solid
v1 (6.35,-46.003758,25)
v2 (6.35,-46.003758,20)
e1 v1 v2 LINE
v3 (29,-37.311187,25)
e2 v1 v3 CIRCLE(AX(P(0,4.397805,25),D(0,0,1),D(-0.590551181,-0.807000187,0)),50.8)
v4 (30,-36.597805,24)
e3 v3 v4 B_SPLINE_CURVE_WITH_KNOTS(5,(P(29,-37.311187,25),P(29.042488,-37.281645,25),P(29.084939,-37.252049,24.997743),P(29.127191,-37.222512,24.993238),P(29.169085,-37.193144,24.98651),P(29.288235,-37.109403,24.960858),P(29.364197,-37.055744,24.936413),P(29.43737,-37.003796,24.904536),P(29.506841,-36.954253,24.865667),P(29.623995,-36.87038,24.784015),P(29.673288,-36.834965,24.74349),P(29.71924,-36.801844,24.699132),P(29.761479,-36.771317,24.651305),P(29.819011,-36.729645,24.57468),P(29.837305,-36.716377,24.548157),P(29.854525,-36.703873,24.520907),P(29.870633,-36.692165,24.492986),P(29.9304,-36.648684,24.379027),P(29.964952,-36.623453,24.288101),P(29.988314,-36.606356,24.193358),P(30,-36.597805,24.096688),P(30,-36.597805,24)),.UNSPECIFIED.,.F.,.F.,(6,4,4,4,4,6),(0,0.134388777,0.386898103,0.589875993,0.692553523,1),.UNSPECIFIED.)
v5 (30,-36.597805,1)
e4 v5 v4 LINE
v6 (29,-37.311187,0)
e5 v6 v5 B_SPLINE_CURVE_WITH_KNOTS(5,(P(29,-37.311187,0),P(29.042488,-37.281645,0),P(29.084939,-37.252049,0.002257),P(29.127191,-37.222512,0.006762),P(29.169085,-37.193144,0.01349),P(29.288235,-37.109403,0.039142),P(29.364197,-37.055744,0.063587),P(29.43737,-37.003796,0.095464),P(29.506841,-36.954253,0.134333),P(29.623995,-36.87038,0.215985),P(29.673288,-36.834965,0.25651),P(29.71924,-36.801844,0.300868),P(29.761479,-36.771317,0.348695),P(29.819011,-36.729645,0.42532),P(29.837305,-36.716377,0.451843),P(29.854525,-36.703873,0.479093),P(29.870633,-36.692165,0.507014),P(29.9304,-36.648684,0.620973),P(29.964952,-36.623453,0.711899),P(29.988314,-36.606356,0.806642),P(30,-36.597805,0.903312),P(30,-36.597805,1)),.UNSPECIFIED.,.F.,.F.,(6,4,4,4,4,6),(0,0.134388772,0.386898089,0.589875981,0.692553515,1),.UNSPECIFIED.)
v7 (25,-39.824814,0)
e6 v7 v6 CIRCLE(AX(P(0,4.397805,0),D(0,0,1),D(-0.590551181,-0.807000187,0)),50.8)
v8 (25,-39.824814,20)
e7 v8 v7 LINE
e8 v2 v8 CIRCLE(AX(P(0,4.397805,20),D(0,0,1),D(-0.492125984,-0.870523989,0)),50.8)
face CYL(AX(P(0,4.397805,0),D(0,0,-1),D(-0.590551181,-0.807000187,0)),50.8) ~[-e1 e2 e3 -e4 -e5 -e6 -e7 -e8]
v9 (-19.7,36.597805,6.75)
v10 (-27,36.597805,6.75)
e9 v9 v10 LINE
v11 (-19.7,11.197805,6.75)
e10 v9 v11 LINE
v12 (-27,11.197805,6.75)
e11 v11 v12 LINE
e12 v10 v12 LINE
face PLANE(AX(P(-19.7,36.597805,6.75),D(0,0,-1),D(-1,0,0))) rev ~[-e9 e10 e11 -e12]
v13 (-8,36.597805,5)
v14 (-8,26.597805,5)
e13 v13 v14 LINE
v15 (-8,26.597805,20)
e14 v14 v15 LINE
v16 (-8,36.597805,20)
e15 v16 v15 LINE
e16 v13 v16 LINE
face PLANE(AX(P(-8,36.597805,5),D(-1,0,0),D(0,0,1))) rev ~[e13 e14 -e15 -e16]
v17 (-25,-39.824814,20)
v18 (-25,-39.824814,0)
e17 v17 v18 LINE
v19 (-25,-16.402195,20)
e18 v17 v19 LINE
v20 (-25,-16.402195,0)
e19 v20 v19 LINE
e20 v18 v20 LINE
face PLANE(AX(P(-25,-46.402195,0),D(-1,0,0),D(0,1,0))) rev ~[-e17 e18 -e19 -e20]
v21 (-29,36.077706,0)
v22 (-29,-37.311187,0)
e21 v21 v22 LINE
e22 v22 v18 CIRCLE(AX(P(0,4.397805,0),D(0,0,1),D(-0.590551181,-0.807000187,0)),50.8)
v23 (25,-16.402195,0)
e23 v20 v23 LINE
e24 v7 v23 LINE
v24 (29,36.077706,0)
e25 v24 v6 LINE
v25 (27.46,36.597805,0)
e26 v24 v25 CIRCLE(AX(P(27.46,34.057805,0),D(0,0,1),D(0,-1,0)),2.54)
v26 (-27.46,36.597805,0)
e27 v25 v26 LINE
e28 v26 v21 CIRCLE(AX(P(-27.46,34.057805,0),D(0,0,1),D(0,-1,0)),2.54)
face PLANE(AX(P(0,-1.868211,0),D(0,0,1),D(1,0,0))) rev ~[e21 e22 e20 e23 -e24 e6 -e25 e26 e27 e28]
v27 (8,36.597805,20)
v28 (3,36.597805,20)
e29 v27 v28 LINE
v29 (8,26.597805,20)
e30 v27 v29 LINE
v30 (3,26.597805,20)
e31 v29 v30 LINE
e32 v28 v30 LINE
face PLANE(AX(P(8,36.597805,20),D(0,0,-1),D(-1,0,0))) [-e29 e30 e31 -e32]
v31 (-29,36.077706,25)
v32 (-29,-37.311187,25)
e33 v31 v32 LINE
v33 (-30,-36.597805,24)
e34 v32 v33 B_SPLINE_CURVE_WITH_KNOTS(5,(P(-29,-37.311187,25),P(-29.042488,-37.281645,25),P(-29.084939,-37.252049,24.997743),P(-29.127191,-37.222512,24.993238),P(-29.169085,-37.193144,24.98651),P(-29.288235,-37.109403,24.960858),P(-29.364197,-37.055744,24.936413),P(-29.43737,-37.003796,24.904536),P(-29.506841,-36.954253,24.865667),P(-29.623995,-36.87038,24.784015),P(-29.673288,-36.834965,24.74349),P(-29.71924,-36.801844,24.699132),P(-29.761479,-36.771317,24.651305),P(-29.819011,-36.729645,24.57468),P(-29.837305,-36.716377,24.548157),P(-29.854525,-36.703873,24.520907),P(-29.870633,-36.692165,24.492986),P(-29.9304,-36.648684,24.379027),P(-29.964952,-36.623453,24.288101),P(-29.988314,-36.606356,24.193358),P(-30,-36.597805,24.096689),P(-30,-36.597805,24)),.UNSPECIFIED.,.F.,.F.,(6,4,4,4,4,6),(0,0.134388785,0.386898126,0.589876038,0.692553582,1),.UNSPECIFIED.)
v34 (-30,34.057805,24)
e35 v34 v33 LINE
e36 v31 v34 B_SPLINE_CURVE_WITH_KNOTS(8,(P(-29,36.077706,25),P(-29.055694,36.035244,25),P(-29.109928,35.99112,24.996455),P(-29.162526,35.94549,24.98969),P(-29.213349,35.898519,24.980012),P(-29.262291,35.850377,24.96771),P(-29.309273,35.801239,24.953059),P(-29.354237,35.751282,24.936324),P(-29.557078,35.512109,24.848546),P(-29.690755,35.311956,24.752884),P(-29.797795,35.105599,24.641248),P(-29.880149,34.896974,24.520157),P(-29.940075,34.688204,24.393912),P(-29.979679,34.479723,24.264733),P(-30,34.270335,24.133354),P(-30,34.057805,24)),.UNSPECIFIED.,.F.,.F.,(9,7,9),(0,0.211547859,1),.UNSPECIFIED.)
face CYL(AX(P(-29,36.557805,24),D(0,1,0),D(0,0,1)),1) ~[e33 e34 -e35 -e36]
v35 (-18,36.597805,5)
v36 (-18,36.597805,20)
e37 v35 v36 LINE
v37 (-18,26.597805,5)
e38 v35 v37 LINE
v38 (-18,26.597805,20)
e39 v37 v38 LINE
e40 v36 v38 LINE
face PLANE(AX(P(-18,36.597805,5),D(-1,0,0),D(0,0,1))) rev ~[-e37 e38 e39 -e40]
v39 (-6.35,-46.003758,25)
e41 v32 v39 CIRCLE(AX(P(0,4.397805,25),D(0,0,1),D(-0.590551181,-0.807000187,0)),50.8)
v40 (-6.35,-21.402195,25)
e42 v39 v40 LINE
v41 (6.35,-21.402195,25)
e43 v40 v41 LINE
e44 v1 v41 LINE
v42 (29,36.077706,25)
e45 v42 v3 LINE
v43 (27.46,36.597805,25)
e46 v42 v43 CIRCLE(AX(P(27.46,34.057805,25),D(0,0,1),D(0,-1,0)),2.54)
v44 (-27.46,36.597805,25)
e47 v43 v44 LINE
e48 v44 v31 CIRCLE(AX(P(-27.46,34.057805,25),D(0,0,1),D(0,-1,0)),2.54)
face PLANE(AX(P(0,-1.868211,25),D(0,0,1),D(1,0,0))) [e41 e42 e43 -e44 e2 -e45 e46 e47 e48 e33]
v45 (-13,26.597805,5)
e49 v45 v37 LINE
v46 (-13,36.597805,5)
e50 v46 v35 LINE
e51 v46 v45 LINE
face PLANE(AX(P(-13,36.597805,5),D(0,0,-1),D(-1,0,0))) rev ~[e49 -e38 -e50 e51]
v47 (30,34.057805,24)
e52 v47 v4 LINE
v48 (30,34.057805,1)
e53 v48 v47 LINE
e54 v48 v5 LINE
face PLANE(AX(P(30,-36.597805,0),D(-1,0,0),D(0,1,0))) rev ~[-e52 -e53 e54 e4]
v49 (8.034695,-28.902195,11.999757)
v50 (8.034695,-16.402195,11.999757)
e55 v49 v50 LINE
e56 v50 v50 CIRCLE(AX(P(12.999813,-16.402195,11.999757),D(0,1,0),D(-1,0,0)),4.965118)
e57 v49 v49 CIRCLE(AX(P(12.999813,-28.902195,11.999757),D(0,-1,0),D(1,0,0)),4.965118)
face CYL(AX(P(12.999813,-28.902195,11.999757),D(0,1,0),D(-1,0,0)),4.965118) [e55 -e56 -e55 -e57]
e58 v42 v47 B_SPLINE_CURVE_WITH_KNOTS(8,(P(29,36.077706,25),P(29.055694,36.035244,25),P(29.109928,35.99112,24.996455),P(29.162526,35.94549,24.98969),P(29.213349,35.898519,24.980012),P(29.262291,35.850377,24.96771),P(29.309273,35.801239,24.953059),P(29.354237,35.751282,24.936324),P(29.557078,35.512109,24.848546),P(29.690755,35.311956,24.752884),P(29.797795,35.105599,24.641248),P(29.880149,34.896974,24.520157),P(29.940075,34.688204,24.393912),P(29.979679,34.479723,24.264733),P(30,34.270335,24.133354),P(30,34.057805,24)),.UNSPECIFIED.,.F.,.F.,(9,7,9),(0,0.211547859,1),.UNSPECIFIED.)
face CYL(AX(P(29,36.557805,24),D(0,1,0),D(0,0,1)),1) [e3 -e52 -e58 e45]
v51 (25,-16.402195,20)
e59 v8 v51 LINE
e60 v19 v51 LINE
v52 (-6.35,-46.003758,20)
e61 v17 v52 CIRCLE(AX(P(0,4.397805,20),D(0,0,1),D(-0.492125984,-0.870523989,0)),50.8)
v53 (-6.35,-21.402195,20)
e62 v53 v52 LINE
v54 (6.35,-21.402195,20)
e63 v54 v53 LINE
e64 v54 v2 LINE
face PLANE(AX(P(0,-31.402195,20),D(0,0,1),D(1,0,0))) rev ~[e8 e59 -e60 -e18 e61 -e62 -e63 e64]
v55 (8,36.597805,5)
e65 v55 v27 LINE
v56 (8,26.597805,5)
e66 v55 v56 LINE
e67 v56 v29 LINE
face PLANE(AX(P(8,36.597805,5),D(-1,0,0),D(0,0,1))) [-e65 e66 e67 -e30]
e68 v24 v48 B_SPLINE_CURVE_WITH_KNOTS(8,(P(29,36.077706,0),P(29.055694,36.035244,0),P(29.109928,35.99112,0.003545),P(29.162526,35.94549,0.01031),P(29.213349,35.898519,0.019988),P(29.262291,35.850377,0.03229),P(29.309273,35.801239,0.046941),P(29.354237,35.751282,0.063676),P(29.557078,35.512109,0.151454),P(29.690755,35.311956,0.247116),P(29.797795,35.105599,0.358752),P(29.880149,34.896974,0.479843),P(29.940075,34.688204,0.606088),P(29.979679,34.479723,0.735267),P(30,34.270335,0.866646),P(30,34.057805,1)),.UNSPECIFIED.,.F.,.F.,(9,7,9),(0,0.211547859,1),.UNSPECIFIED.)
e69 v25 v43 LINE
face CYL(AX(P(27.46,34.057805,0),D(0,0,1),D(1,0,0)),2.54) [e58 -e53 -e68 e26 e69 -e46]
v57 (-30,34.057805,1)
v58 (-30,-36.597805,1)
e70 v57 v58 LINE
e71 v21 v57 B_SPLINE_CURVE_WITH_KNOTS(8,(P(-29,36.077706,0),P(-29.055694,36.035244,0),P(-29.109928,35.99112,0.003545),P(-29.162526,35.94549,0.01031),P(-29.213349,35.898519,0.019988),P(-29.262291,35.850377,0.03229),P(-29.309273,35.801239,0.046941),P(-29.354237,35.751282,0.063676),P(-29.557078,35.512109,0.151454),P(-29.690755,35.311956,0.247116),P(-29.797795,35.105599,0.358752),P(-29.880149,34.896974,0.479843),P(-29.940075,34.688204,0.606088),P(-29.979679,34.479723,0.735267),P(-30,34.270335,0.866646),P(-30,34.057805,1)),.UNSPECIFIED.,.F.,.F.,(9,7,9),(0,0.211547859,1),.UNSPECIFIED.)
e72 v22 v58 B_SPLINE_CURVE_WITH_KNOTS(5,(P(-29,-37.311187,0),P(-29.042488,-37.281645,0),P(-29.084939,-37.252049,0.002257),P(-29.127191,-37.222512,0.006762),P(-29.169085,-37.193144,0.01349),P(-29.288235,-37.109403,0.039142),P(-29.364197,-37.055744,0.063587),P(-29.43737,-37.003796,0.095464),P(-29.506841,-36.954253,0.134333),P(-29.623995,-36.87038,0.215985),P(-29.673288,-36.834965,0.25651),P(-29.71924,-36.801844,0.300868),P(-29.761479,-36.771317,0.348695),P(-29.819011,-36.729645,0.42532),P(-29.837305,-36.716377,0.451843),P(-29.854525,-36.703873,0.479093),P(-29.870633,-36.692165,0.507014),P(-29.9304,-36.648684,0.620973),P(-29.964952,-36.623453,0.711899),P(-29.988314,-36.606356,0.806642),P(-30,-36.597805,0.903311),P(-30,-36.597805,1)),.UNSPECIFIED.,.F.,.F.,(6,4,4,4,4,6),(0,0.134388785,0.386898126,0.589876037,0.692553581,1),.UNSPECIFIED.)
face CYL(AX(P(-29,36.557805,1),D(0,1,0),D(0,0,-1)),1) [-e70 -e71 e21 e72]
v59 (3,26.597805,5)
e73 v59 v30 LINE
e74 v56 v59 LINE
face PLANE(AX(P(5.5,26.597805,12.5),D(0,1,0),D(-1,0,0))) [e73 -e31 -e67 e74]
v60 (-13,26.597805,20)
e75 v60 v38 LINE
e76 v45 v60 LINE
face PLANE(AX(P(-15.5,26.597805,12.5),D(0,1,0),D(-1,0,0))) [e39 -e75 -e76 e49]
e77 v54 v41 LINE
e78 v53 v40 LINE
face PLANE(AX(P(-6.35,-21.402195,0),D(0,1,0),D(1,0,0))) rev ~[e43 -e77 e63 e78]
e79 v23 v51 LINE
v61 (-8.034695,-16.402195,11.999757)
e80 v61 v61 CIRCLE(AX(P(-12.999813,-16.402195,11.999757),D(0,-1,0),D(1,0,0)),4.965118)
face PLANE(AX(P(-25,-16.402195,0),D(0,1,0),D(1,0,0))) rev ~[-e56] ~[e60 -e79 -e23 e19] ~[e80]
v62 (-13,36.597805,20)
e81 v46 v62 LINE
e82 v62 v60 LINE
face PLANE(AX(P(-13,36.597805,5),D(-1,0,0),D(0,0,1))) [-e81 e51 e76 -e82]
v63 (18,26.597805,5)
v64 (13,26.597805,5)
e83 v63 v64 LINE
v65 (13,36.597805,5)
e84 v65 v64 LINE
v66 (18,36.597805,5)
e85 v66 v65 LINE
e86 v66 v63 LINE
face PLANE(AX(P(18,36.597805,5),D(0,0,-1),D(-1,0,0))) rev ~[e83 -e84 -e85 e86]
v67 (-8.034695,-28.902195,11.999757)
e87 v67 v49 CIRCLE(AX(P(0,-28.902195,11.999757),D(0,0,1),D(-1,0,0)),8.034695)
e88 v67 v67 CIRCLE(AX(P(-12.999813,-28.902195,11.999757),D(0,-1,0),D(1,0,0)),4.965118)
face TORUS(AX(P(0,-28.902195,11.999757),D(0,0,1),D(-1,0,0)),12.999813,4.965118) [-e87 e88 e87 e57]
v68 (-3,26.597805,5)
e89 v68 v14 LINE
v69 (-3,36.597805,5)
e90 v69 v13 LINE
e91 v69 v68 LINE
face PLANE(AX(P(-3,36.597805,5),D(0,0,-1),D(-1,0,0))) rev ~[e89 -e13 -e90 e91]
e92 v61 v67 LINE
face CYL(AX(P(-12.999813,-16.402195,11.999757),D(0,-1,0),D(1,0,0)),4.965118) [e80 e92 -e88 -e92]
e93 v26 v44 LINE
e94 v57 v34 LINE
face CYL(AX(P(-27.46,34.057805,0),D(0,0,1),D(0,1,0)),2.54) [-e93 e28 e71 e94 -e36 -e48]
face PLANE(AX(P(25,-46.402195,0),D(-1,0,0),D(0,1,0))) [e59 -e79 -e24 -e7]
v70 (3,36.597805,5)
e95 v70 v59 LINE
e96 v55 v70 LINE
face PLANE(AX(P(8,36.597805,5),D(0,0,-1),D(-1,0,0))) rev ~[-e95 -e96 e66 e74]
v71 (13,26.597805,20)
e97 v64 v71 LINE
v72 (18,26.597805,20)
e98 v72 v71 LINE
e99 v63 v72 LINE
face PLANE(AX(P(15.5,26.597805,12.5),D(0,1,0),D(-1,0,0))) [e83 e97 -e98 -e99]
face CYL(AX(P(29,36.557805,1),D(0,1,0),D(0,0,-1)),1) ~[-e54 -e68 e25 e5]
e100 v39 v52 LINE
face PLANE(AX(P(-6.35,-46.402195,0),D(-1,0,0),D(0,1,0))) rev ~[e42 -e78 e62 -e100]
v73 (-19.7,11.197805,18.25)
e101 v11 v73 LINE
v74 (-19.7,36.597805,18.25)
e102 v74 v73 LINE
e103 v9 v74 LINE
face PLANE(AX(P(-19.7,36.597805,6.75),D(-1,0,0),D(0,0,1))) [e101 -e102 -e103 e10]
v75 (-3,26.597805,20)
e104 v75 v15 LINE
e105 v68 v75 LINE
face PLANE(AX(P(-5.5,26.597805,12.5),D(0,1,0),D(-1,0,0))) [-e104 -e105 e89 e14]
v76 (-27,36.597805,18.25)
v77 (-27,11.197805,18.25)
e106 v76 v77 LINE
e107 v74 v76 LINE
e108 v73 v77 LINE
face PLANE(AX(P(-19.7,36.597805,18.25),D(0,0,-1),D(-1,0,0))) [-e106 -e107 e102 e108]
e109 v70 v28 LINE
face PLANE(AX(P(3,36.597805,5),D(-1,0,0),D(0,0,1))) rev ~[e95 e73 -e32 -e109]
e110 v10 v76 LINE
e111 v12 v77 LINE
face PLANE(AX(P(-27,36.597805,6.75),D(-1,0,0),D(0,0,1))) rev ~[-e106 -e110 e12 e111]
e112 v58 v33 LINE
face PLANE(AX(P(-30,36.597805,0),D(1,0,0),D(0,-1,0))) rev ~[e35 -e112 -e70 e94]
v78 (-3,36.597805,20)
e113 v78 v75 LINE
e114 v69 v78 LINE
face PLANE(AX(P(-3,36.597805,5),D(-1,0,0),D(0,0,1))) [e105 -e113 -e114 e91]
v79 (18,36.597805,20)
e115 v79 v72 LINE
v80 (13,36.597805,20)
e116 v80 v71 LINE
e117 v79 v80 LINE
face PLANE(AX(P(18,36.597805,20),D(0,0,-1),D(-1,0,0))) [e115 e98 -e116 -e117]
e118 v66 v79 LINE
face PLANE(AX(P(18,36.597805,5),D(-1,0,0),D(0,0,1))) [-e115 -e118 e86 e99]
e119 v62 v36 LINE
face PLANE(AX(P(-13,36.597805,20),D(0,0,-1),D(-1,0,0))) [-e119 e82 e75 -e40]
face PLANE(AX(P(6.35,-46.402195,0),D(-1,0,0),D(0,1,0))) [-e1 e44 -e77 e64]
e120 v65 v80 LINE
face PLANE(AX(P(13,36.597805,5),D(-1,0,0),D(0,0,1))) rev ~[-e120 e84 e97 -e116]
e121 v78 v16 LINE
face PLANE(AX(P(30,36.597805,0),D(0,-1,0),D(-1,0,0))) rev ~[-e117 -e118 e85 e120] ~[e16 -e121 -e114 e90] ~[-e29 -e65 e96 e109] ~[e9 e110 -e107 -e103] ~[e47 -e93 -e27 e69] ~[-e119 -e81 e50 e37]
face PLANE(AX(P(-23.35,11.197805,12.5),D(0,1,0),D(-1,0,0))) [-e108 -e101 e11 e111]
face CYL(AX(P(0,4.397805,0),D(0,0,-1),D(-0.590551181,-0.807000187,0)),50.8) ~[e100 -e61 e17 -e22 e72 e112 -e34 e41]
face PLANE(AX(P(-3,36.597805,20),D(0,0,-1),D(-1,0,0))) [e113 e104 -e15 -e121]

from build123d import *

# Parameters (mm, degrees)
F1_DEPTH    = 25
F3_R        = 2.54
F4_W        = 50
F4_H        = 30
F5_DEPTH    = 20
F2_W        = 12.7
F2_H        = 25
F6_DEPTH    = 25
F7_T1_DEPTH = 75.655609521
F9_W        = 5
F9_H        = 15
F10_DEPTH   = 10
F11_W       = 7.3
F11_H       = 11.5
F12_DEPTH   = 25.4
F15_R       = 4.9651178244


# Not quite as in the source:
# - a fillet or chamfer that OpenCascade refuses, or shapes differently, is made with other operations: its cross-section is extruded or revolved along the edge and cut away or added
# - a feature names something its author has since deleted; it is built from what else it names


with BuildPart() as f1:
    # F0 (on Top) → F1 (new body)
    with BuildSketch(Plane.XY):
        with BuildLine():
            Line((30, -36.5978047605), (30, 36.5978047605))
            Line((30, 36.5978047605), (-30, 36.5978047605))
            Line((-30, 36.5978047605), (-30, -36.5978047605))
            ThreePointArc((-30, -36.5978047605), (0, -46.4021952395), (30, -36.5978047605))
        make_face()
    extrude(amount=F1_DEPTH)

    # F3
    f3_edges = [f1.edges().sort_by_distance(p)[0] for p in [
        (-30, 36.597805, 12.5),
        (30, 36.597805, 12.5),
    ]]
    fillet(f3_edges, radius=F3_R)

    # F4 (on face) → F5 (cut)
    with BuildSketch(Plane.XY):
        with Locations((0, -31.4021952395)):
            Rectangle(F4_W, F4_H)
    extrude(amount=F5_DEPTH, mode=Mode.SUBTRACT)

    # F2 (on Top) → F6 (cut, through all)
    with BuildSketch(Plane.XY):
        with Locations((0, -33.9021952395)):
            Rectangle(F2_W, F2_H)
    extrude(amount=F6_DEPTH, mode=Mode.SUBTRACT)

    # F7: fillet of radius 1 on 4 edges, made by hand

    # F7_s2 → F7_t1 (cut)
    with BuildSketch(Plane.XZ.offset(-36.5578047605)):
        with BuildLine():
            ThreePointArc((29, 0), (29.7071067812, 0.2928932188), (30, 1))
            Line((30, 1), (30, 0))
            Line((30, 0), (29, 0))
        make_face()
        with BuildLine():
            ThreePointArc((29, 25), (29.7071067812, 24.7071067812), (30, 24))
            Line((30, 24), (30, 25))
            Line((30, 25), (29, 25))
        make_face()
        with BuildLine():
            ThreePointArc((-29, 25), (-29.7071067812, 24.7071067812), (-30, 24))
            Line((-30, 24), (-30, 25))
            Line((-30, 25), (-29, 25))
        make_face()
        with BuildLine():
            ThreePointArc((-29, 0), (-29.7071067812, 0.2928932188), (-30, 1))
            Line((-30, 1), (-30, 0))
            Line((-30, 0), (-29, 0))
        make_face()
    extrude(amount=F7_T1_DEPTH, mode=Mode.SUBTRACT)

    # F9 (on face) → F10 (cut)
    with BuildSketch(Plane(origin=(0, 36.5978047605, 0), x_dir=(-1, 0, 0), z_dir=(0, 1, 0))):
        with Locations((-15.5, 12.5)):
            Rectangle(F9_W, F9_H)
        with Locations((15.5, 12.5)):
            Rectangle(F9_W, F9_H)
        with Locations((-5.5, 12.5)):
            Rectangle(F9_W, F9_H)
        with Locations((5.5, 12.5)):
            Rectangle(F9_W, F9_H)
    extrude(amount=-F10_DEPTH, mode=Mode.SUBTRACT)

    # F11 (on face) → F12 (cut)
    with BuildSketch(Plane(origin=(0, 36.5978047605, 0), x_dir=(-1, 0, 0), z_dir=(0, 1, 0))):
        with Locations((23.35, 12.5)):
            Rectangle(F11_W, F11_H)
    extrude(amount=-F12_DEPTH, mode=Mode.SUBTRACT)

    # F16: sweep along a path in F14
    with BuildLine(Plane.XY.offset(12)) as f16_path:
        Line((-13, -16.4021952395), (-13, -28.9021952395))
        ThreePointArc((-13, -28.9021952395), (0, -41.9021952395), (13, -28.9021952395))
        Line((13, -28.9021952395), (13, -16.4021952395))
    # F15 (on face) → F16 (sweep)
    with BuildSketch(Plane.XZ.offset(16.4021952395)):
        with Locations((-12.9998130724, 11.9997570291)):
            Circle(F15_R)
    sweep(path=f16_path.line)


solid = f1.part
